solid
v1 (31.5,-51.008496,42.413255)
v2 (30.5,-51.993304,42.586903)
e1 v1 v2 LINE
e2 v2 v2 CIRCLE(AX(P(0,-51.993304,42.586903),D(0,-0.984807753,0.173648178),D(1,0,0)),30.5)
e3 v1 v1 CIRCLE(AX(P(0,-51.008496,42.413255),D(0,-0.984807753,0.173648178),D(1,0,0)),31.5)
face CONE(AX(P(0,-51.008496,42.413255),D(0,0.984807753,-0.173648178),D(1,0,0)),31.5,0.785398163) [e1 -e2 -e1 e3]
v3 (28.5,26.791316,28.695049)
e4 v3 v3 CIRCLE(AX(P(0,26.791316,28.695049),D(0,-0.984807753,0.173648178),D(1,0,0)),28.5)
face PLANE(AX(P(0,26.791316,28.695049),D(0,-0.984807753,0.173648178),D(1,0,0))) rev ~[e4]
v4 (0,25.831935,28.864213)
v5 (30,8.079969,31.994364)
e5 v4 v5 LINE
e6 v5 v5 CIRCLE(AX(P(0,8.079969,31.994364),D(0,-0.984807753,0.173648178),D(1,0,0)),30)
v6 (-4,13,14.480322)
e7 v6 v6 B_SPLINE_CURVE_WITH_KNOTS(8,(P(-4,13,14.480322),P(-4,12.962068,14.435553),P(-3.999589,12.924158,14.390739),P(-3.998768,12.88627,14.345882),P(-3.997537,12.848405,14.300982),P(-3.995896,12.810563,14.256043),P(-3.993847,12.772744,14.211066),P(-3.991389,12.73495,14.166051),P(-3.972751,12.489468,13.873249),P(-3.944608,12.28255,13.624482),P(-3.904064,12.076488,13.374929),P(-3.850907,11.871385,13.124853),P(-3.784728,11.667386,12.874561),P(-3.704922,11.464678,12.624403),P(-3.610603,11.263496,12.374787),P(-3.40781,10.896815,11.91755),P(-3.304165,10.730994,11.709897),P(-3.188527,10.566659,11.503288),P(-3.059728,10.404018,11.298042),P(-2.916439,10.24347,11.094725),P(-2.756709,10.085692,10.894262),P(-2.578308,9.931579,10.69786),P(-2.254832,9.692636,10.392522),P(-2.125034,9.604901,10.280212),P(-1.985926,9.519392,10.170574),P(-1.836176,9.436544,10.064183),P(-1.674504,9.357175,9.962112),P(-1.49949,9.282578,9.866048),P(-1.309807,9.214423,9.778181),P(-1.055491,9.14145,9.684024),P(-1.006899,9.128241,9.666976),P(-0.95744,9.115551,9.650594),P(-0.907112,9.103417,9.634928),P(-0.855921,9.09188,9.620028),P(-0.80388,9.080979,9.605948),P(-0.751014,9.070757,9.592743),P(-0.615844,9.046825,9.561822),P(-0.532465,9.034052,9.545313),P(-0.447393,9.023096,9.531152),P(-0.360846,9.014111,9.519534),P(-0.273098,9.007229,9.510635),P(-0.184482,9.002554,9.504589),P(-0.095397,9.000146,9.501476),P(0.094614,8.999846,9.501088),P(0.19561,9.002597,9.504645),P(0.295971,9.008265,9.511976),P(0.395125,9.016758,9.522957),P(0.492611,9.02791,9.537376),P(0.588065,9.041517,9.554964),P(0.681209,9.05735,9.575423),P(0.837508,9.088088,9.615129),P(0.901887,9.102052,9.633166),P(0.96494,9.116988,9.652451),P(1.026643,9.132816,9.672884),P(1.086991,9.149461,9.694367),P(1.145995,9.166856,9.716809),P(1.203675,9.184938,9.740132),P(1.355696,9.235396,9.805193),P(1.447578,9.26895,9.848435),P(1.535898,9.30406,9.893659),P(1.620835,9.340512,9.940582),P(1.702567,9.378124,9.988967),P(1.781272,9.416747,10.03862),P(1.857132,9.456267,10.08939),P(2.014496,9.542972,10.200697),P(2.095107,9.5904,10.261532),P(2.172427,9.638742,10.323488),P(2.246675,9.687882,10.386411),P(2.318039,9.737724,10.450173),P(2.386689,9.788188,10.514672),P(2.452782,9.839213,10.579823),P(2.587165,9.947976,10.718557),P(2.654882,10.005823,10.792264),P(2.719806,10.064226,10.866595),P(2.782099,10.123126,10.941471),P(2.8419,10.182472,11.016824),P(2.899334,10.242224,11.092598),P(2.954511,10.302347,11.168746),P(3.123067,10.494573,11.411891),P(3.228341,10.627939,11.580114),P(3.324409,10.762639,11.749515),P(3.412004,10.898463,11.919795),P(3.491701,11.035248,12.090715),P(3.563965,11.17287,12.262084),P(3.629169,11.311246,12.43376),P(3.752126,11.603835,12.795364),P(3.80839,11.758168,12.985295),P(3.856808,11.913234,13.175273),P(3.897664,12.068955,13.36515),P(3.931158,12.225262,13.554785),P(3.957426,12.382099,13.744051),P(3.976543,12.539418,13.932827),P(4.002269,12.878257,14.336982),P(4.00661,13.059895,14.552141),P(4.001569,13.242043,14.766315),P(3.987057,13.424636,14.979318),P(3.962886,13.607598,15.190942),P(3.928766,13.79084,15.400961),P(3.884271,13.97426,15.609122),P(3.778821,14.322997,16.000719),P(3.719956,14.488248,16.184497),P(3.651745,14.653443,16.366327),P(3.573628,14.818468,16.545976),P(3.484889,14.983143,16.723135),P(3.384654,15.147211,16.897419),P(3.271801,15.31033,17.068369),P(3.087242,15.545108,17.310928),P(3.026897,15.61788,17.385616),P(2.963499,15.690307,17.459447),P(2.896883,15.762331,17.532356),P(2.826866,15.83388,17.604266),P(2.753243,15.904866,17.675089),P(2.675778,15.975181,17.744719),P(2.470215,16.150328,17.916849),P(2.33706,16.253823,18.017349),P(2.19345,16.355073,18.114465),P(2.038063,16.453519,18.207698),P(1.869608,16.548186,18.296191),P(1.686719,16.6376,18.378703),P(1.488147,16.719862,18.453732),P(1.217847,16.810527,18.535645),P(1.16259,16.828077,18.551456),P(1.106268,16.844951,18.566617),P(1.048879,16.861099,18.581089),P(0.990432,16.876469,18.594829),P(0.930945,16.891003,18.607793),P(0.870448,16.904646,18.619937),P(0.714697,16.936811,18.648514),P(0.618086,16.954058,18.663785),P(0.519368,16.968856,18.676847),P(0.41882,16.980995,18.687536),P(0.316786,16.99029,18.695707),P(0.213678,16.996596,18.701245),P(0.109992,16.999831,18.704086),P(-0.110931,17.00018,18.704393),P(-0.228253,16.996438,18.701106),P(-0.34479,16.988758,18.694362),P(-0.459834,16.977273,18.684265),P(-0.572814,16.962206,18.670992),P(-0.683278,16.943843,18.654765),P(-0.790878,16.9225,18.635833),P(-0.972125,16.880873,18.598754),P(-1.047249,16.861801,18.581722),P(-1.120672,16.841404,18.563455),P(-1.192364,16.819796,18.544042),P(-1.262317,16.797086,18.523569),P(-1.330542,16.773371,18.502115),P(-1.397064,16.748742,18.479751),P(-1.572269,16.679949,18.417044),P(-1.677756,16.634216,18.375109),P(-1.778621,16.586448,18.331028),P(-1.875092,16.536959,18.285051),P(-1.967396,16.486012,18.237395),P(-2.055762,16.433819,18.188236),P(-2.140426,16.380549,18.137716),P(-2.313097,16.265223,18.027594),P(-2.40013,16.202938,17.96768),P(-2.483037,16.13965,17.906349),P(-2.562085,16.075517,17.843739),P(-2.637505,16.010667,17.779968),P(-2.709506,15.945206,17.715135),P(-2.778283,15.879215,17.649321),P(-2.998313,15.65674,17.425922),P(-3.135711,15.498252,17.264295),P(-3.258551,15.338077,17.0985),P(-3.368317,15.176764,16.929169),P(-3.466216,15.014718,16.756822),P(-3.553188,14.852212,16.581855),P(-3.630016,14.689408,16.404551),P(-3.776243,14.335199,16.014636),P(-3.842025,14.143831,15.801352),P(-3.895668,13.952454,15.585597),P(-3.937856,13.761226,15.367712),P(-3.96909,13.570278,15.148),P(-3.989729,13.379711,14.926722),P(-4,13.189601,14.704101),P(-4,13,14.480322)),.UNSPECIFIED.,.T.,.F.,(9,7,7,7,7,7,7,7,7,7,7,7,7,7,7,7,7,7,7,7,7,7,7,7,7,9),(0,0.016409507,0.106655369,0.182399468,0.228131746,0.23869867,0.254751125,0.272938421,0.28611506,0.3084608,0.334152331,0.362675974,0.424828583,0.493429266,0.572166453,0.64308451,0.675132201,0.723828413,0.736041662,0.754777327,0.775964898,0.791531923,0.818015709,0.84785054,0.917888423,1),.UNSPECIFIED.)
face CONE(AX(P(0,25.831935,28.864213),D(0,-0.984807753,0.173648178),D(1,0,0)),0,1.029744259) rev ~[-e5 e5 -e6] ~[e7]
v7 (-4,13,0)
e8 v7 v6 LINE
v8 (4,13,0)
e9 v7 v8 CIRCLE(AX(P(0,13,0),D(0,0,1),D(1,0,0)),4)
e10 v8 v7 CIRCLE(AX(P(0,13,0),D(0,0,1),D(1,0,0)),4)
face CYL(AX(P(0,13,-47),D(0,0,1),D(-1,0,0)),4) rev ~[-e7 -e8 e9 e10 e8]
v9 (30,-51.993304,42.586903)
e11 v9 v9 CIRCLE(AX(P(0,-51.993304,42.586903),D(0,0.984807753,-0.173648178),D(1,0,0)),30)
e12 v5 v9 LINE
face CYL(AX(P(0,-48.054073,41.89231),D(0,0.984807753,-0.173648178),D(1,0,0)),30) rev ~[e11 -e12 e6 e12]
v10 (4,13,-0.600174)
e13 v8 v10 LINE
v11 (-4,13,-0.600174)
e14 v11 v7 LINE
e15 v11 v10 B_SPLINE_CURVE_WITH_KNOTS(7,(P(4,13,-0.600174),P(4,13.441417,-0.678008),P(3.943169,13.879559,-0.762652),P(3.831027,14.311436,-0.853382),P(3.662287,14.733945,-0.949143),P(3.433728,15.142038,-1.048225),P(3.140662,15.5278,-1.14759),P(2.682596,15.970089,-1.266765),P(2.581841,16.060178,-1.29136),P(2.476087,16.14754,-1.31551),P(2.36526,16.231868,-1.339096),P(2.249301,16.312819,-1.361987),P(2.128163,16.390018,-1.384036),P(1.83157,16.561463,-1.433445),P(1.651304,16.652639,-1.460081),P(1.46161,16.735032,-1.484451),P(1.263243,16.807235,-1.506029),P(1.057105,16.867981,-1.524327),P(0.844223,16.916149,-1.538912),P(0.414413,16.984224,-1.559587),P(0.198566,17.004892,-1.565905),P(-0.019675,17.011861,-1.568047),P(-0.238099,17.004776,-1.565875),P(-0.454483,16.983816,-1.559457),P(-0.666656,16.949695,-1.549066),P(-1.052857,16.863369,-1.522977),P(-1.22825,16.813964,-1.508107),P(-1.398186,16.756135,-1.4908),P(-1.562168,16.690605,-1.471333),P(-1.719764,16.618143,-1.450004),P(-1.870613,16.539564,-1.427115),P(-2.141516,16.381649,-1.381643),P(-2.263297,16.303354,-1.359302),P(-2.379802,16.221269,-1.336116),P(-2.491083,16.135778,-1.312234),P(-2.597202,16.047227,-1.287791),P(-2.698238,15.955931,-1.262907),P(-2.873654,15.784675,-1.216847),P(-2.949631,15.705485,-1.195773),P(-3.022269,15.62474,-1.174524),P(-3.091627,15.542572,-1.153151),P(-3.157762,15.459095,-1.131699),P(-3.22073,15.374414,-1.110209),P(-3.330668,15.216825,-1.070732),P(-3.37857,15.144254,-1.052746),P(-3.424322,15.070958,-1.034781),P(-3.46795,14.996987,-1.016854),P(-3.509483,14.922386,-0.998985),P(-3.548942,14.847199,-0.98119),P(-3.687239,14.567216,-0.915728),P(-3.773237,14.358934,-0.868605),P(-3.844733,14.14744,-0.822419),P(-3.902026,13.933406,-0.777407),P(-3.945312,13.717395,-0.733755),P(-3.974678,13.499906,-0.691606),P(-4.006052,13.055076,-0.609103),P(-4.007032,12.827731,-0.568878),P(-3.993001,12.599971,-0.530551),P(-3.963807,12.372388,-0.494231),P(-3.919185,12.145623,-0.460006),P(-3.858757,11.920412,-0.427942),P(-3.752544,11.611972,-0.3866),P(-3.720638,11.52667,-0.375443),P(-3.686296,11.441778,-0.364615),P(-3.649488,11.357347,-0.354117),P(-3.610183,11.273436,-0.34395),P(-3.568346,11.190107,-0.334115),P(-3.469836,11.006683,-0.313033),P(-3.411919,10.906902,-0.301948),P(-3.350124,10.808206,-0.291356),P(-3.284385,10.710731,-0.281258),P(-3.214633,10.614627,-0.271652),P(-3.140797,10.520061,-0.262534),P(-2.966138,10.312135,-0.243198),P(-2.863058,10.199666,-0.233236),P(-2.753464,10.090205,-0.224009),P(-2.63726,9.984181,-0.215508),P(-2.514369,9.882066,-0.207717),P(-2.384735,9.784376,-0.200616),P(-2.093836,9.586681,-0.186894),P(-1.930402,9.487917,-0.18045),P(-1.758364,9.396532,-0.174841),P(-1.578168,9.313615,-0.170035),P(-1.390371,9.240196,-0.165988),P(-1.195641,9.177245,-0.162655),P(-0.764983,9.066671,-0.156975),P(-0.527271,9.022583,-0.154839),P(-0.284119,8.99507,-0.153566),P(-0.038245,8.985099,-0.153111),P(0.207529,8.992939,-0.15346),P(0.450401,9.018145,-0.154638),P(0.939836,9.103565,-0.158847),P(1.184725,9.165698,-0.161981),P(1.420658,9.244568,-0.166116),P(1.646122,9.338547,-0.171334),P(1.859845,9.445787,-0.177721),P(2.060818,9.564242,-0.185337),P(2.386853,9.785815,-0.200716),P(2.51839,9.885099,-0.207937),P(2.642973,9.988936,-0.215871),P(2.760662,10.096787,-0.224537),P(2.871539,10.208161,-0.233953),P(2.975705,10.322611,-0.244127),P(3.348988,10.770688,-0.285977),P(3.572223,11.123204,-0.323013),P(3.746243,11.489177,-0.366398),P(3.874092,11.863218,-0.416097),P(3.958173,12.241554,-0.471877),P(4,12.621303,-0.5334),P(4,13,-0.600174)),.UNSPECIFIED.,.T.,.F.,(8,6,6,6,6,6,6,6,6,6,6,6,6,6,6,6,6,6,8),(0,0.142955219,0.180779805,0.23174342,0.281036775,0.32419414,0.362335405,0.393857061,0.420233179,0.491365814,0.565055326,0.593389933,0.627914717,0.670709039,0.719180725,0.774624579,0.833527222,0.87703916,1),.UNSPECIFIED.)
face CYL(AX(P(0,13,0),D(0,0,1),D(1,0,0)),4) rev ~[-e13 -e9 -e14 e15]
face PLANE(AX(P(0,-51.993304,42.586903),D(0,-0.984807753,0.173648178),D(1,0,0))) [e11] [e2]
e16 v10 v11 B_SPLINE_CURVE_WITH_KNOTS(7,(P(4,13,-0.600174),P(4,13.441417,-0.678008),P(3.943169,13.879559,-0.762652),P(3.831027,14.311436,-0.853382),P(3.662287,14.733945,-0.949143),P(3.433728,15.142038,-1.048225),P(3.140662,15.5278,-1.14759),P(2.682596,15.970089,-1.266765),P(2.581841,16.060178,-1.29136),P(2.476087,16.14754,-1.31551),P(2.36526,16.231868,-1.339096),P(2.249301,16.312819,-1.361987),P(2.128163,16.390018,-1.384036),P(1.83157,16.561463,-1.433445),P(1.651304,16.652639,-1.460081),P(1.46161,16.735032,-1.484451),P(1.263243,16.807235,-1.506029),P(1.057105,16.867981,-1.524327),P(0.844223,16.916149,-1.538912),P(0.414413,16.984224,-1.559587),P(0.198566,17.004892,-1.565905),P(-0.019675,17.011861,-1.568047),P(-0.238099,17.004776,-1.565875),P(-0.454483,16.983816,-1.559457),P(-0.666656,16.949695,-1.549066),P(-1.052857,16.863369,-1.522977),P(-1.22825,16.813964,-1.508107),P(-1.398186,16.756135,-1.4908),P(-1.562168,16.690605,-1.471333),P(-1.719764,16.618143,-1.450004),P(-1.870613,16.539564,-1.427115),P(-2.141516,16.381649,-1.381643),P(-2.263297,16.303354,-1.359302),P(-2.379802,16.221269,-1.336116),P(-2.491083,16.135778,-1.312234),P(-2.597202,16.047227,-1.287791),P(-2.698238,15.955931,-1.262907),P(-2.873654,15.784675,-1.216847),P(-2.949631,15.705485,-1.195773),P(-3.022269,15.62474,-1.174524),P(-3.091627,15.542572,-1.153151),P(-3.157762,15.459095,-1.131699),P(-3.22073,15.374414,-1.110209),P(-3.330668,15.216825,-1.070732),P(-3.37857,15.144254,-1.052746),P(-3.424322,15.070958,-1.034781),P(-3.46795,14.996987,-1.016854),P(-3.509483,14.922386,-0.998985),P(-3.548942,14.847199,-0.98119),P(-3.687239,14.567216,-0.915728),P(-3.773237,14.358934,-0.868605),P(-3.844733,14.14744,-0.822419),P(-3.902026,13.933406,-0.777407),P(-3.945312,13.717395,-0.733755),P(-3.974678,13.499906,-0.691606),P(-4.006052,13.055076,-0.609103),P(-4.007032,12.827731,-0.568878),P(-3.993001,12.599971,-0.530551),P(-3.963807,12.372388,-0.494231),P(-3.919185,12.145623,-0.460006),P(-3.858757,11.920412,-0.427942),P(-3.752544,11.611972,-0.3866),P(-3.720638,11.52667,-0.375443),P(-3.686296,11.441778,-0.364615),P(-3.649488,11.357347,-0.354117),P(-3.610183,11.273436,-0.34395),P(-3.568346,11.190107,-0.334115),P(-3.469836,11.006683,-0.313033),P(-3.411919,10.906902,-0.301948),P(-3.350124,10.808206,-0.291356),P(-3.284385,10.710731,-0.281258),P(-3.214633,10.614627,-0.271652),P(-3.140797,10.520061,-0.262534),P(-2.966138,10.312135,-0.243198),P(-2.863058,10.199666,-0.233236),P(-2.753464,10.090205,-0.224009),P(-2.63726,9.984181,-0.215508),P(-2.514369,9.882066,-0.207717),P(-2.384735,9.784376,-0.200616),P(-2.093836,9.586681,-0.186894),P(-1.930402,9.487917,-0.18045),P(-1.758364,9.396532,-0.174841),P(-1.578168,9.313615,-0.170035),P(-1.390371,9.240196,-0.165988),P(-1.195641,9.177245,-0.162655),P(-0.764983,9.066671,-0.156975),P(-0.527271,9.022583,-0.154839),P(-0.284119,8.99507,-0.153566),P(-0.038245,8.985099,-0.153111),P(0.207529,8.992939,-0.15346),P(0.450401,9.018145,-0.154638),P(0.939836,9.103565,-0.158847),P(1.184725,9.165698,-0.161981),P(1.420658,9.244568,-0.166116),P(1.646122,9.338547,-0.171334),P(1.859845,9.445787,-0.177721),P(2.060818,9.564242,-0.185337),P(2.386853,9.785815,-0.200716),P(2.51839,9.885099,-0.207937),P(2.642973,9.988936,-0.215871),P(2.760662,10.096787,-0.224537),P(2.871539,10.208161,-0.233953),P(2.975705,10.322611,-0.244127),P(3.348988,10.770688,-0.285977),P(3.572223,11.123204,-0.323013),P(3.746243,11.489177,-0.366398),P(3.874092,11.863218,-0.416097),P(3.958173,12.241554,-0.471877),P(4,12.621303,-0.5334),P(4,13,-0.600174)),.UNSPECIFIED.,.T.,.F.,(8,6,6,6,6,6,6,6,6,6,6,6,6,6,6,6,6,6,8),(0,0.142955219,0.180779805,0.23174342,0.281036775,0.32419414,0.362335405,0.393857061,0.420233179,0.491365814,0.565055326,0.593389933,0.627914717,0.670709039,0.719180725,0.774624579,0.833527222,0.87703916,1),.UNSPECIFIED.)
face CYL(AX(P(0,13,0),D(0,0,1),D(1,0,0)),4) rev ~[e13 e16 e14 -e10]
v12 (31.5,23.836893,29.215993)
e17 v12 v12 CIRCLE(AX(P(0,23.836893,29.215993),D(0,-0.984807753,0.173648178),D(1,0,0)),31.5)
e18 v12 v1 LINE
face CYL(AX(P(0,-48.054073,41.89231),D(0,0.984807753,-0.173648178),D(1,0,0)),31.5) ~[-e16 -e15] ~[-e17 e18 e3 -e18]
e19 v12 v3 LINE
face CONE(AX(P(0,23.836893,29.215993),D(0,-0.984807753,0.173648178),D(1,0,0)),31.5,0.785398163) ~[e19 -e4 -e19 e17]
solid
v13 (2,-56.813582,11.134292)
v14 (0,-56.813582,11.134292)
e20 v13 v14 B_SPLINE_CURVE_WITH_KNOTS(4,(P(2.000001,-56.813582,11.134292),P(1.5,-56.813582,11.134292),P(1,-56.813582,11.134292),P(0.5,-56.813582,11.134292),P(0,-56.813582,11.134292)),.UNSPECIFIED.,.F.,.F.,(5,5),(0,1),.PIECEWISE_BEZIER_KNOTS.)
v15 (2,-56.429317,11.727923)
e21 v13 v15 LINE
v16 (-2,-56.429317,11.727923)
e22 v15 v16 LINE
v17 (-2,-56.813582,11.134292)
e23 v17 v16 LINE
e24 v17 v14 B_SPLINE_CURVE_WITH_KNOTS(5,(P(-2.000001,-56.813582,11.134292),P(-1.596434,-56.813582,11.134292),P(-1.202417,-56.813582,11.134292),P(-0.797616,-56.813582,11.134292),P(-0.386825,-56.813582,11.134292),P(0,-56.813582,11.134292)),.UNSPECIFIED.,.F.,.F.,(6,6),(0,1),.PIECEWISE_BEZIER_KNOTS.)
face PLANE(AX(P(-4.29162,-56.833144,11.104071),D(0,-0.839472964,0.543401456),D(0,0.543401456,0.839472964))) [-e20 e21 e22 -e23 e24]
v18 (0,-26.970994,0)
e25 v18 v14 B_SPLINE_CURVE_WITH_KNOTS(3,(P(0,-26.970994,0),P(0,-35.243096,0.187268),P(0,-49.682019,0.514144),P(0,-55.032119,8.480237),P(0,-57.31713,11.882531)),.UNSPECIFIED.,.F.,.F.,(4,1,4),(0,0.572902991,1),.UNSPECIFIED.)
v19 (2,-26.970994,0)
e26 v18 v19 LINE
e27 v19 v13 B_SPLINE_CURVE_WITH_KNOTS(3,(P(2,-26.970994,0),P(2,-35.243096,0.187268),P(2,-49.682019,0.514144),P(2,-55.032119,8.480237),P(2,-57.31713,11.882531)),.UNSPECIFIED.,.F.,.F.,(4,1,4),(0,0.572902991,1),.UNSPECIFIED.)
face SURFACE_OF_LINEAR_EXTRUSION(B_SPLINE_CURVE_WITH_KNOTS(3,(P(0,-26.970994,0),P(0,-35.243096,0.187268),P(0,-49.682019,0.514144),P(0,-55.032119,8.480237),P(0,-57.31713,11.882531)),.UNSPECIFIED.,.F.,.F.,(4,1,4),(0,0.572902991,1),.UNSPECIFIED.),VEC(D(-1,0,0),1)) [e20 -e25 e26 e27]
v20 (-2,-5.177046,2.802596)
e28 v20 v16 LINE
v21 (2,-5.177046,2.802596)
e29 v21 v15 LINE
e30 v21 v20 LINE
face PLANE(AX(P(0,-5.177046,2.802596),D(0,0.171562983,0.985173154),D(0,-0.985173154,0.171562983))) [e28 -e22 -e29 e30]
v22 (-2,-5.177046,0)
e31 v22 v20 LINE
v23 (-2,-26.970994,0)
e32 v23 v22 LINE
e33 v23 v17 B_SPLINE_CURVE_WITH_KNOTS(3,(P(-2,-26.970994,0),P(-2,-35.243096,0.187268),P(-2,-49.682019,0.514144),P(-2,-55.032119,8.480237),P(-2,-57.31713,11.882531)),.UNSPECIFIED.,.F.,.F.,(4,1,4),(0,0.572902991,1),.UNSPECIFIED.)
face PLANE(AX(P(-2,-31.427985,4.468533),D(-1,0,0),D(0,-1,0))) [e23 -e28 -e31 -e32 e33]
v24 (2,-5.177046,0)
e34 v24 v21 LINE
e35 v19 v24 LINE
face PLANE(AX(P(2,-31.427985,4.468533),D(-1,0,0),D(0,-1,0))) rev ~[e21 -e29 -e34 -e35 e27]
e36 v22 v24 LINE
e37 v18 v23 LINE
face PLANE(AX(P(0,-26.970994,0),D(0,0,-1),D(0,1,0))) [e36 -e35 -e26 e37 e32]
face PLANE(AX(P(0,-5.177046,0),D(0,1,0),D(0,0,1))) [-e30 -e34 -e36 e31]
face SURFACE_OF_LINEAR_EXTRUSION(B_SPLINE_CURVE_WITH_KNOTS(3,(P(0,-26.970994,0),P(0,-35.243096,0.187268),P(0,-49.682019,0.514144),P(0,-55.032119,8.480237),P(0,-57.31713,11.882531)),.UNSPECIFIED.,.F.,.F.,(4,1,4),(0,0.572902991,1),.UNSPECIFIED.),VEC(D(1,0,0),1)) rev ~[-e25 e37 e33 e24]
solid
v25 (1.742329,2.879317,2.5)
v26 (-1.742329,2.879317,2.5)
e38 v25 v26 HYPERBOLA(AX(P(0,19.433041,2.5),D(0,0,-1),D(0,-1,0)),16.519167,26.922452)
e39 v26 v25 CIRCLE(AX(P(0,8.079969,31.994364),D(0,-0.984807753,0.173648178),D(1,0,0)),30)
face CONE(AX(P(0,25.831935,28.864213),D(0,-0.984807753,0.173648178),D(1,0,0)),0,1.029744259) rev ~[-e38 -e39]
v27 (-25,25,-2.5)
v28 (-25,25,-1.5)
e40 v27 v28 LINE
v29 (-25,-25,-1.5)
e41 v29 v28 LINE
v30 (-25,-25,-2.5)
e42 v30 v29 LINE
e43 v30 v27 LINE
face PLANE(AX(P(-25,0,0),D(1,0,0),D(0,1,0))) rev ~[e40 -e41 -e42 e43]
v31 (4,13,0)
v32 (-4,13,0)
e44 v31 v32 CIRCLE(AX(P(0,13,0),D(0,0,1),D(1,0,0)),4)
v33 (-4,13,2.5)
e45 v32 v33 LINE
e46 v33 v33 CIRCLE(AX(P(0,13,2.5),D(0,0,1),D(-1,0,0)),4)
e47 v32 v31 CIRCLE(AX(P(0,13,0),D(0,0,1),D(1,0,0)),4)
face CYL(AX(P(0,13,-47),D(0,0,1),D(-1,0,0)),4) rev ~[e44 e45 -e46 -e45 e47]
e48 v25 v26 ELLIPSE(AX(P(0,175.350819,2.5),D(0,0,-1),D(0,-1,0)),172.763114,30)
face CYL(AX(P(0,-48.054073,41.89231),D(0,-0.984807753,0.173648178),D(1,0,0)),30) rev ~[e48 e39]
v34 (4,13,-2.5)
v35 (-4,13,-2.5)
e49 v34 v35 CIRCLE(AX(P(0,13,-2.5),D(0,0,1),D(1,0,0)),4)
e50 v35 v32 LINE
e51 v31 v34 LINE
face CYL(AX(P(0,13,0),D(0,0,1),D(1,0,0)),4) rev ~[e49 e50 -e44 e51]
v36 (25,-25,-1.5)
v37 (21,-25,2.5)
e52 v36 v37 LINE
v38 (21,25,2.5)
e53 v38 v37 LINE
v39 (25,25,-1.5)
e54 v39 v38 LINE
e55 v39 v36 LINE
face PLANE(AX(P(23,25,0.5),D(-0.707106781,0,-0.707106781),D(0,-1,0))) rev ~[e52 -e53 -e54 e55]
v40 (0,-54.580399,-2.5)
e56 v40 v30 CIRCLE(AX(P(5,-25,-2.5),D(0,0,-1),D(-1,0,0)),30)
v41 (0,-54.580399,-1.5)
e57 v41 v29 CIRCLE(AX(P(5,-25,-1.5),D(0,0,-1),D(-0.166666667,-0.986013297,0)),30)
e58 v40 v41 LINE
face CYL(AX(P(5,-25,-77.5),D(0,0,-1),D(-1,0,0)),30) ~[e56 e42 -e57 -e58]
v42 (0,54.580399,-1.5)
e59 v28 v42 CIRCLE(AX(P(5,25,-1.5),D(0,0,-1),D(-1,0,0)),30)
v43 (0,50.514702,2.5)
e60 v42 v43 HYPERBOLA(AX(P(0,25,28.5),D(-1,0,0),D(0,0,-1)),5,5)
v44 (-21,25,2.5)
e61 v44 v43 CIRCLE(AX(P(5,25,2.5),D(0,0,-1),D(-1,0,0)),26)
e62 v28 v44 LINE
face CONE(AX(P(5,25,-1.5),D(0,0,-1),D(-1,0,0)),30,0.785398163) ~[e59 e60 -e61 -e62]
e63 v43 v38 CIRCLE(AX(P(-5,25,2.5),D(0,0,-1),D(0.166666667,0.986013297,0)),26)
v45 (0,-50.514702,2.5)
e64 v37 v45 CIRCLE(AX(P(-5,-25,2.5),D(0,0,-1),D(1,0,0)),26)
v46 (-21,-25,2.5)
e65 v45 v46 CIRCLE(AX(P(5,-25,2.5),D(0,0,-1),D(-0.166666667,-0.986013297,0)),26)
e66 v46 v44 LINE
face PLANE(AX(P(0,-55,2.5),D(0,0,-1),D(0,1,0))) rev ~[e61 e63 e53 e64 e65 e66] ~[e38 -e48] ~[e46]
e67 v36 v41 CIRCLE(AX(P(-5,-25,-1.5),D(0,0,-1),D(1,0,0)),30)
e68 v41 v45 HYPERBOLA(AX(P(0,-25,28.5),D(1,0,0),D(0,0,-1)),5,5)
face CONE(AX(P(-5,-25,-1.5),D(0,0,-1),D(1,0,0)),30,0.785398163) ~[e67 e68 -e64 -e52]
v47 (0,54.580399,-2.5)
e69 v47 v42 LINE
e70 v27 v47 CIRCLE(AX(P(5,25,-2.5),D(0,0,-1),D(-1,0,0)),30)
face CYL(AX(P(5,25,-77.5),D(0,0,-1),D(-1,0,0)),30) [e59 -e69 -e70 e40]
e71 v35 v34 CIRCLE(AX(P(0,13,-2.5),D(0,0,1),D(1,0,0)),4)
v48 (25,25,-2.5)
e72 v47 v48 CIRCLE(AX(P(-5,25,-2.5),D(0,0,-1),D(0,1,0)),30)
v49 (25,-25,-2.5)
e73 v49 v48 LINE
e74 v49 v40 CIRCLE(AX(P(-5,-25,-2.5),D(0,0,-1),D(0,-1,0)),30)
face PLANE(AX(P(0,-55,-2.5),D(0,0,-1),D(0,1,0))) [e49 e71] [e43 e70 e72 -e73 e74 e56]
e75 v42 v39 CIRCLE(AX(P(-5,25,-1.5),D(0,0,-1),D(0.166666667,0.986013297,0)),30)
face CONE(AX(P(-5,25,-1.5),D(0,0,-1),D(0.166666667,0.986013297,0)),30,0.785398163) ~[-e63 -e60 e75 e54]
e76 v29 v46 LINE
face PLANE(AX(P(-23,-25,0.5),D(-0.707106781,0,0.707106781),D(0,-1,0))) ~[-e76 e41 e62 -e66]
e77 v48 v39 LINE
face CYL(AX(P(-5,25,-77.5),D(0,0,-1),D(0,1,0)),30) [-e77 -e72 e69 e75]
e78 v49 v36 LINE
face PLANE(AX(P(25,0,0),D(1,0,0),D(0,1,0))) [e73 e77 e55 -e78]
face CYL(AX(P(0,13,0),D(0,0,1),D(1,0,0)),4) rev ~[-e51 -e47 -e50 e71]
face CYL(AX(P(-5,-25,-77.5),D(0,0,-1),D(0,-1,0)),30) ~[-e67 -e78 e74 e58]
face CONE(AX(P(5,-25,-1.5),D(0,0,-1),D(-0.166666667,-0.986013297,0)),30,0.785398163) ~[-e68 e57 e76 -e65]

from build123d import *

# Parameters (mm, degrees)
F0_W          = 110
F0_H          = 5
F1_DEPTH      = 25
F3_R          = 31.5
F4_DEPTH      = 76
F4_DEPTH_BACK = 4
F5_D          = 60
F5_DEPTH      = 57
F5_TIP        = 18.0258185708
F5_2_D        = 60
F5_2_DEPTH    = 57
F5_2_TIP      = 18.0258185708
F6_D          = 60
F6_DEPTH      = 45
F6_TIP        = 18.0258185708
F8_D          = 8
F8_DEPTH      = 47
F8_TIP        = 2.4034424761
F8_2_D        = 8
F8_2_DEPTH    = 47
F8_2_TIP      = 2.4034424761
F10_DEPTH     = 2
F11_T1_DEPTH  = 155
F12_SIZE      = 3
F13_SIZE      = 1
F14_SIZE      = 4
F15_D         = 8
F15_DEPTH     = 47
F15_TIP       = 2.4034424761
F15_2_D       = 8
F15_2_DEPTH   = 47
F15_2_TIP     = 2.4034424761
F16_T1_DEPTH  = 4.2916195716
F16_T3_DEPTH  = 4.2916195716


# Not quite as in the source:
# - a fillet or chamfer that OpenCascade refuses, or shapes differently, is made with other operations: its cross-section is extruded or revolved along the edge and cut away or added


with BuildPart() as f1:
    # F0 (on Right) → F1 (new body, symmetric)
    with BuildSketch(Plane.YZ):
        Rectangle(F0_W, F0_H)
    extrude(amount=F1_DEPTH, both=True)

    # F5 (one way)
    with BuildSketch(Plane(origin=(0, -53.7690722508, 9.4809381655), x_dir=(1, 0, 0), z_dir=(0, -0.984807753, 0.1736481777))):
        with Locations((0, 32.9113696108)):
            Circle(F5_D / 2)
    extrude(amount=-F5_DEPTH, mode=Mode.SUBTRACT)
    with Locations(Plane(origin=(0, -53.7690722508, 9.4809381655), x_dir=(1, 0, 0), z_dir=(0, -0.984807753, 0.1736481777))):
        with Locations((0, 32.9113696108)):
            with Locations((0, 0, -(F5_DEPTH + F5_TIP / 2))):  # 118° drill point
                Cone(0, F5_D / 2, F5_TIP, mode=Mode.SUBTRACT)

    # F8 (one way)
    with BuildSketch(Plane.XY):
        with Locations((0, 13)):
            Circle(F8_D / 2)
    extrude(amount=-F8_DEPTH, mode=Mode.SUBTRACT)
    with Locations(Plane.XY):
        with Locations((0, 13)):
            with Locations((0, 0, -(F8_DEPTH + F8_TIP / 2))):  # 118° drill point
                Cone(0, F8_D / 2, F8_TIP, mode=Mode.SUBTRACT)

    # F11: fillet of radius 30 on 4 edges, made by hand

    # F11_s2 → F11_t1 (cut)
    with BuildSketch(Plane.XY.offset(-77.5)):
        with BuildLine():
            ThreePointArc((-25, -25), (-16.2132034356, -46.2132034356), (5, -55))
            Line((5, -55), (-25, -55))
            Line((-25, -55), (-25, -25))
        make_face()
        with BuildLine():
            ThreePointArc((-5, -55), (16.2132034356, -46.2132034356), (25, -25))
            Line((25, -25), (25, -55))
            Line((25, -55), (-5, -55))
        make_face()
        with BuildLine():
            ThreePointArc((-25, 25), (-16.2132034356, 46.2132034356), (5, 55))
            Line((5, 55), (-25, 55))
            Line((-25, 55), (-25, 25))
        make_face()
        with BuildLine():
            ThreePointArc((-5, 55), (16.2132034356, 46.2132034356), (25, 25))
            Line((25, 25), (25, 55))
            Line((25, 55), (-5, 55))
        make_face()
    extrude(amount=F11_T1_DEPTH, mode=Mode.SUBTRACT)

    # F14
    f14_edges = [f1.edges().sort_by_distance(p)[0] for p in [
        (17.912878, -44.364917, 2.5),
        (25, 0, 2.5),
        (17.912878, 44.364917, 2.5),
        (-17.912878, 44.364917, 2.5),
        (-25, 0, 2.5),
        (-17.912878, -44.364917, 2.5),
    ]]
    chamfer(f14_edges, length=F14_SIZE)

    # F15
    with Locations(Plane(origin=(0, 0, 0), x_dir=(1, 0, 0), z_dir=(0, 0, -1))):
        with Locations((0, -13)):
            Hole(F15_D / 2, depth=F15_DEPTH)
            with Locations((0, 0, -(F15_DEPTH + F15_TIP / 2))):  # 118° drill point
                Cone(0, F15_D / 2, F15_TIP, mode=Mode.SUBTRACT)


with BuildPart() as f4:
    # F3 (on face) → F4 (new body, two sides)
    with BuildSketch(Plane(origin=(0, -53.7690722508, 9.4809381655), x_dir=(1, 0, 0), z_dir=(0, -0.984807753, 0.1736481777))) as f4_sk:
        with Locations((0, 32.9113696108)):
            Circle(F3_R)
    extrude(amount=-F4_DEPTH)
    extrude(f4_sk.sketch, amount=F4_DEPTH_BACK)

    # F5#2 (one way)
    with BuildSketch(Plane(origin=(0, -53.7690722508, 9.4809381655), x_dir=(1, 0, 0), z_dir=(0, -0.984807753, 0.1736481777))):
        with Locations((0, 32.9113696108)):
            Circle(F5_2_D / 2)
    extrude(amount=-F5_2_DEPTH, mode=Mode.SUBTRACT)
    with Locations(Plane(origin=(0, -53.7690722508, 9.4809381655), x_dir=(1, 0, 0), z_dir=(0, -0.984807753, 0.1736481777))):
        with Locations((0, 32.9113696108)):
            with Locations((0, 0, -(F5_2_DEPTH + F5_2_TIP / 2))):  # 118° drill point
                Cone(0, F5_2_D / 2, F5_2_TIP, mode=Mode.SUBTRACT)

    # F6 (one way)
    with BuildSketch(Plane(origin=(0, -53.7690722508, 9.4809381655), x_dir=(1, 0, 0), z_dir=(0, 0.984807753, -0.1736481777))):
        with Locations((0, -32.9113696108)):
            Circle(F6_D / 2)
    extrude(amount=-F6_DEPTH, mode=Mode.SUBTRACT)
    with Locations(Plane(origin=(0, -53.7690722508, 9.4809381655), x_dir=(1, 0, 0), z_dir=(0, 0.984807753, -0.1736481777))):
        with Locations((0, -32.9113696108)):
            with Locations((0, 0, -(F6_DEPTH + F6_TIP / 2))):  # 118° drill point
                Cone(0, F6_D / 2, F6_TIP, mode=Mode.SUBTRACT)

    # F8#2 (one way)
    with BuildSketch(Plane.XY):
        with Locations((0, 13)):
            Circle(F8_2_D / 2)
    extrude(amount=-F8_2_DEPTH, mode=Mode.SUBTRACT)
    with Locations(Plane.XY):
        with Locations((0, 13)):
            with Locations((0, 0, -(F8_2_DEPTH + F8_2_TIP / 2))):  # 118° drill point
                Cone(0, F8_2_D / 2, F8_2_TIP, mode=Mode.SUBTRACT)

    # F12
    f12_edges = [f4.edges().sort_by_distance(p)[0] for p in [
        (-31.5, 26.791316, 28.695049),
    ]]
    chamfer(f12_edges, length=F12_SIZE)

    # F13
    f13_edges = [f4.edges().sort_by_distance(p)[0] for p in [
        (-31.5, -51.993304, 42.586903),
    ]]
    chamfer(f13_edges, length=F13_SIZE)

    # F15#2
    with Locations(Plane(origin=(0, 0, 0), x_dir=(1, 0, 0), z_dir=(0, 0, -1))):
        with Locations((0, -13)):
            Hole(F15_2_D / 2, depth=F15_2_DEPTH)
            with Locations((0, 0, -(F15_2_DEPTH + F15_2_TIP / 2))):  # 118° drill point
                Cone(0, F15_2_D / 2, F15_2_TIP, mode=Mode.SUBTRACT)


with BuildPart() as f10:
    # F9 (on Right) → F10 (new body, symmetric)
    with BuildSketch(Plane.YZ):
        with BuildLine():
            add(Edge.make_bspline(
                [(-26.9709937274, 0), (-35.2430958686, 0.1872683322), (-49.6820188119, 0.5141444964), (-55.0321186352, 8.4802371226), (-57.3171302676, 11.8825314566)],
                knots=[0, 0, 0, 0, 0.572902991, 1, 1, 1, 1], degree=3))
            Line((-26.9709937274, 0), (-5.1770457067, 0))
            Line((-5.1770457067, 0), (-5.1770457067, 2.8025961947))
            Line((-5.1770457067, 2.8025961947), (-57.3171302676, 11.8825314566))
        make_face()
    extrude(amount=F10_DEPTH, both=True)

    # F16: chamfer of 0.9 on 2 edges, made by hand

    # F16_s2 → F16_t1 (cut)
    with BuildSketch(Plane.YZ.offset(-4.2916195716)):
        with BuildLine():
            Line((-56.8331442384, 11.1040709469), (-56.4097543552, 11.7581442044))
            Line((-56.4097543552, 11.7581442044), (-56.4066662215, 11.7758773211))
            ThreePointArc((-56.4066662215, 11.7758773211), (-56.8631960445, 11.8217519791), (-57.3140421339, 11.9002645734))
            Line((-57.3140421339, 11.9002645734), (-57.3320729998, 11.8724957826))
            ThreePointArc((-57.3320729998, 11.8724957826), (-57.0766052058, 11.4923137573), (-56.8480585259, 11.0939930489))
            Line((-56.8480585259, 11.0939930489), (-56.8331442384, 11.1040709469))
        make_face()
    extrude(amount=F16_T1_DEPTH, mode=Mode.SUBTRACT)

    # F16_s4 → F16_t3 (cut)
    with BuildSketch(Plane.YZ):
        with BuildLine():
            Line((-56.8331442384, 11.1040709469), (-56.4097543552, 11.7581442044))
            Line((-56.4097543552, 11.7581442044), (-56.4066662215, 11.7758773211))
            ThreePointArc((-56.4066662215, 11.7758773211), (-56.8631960445, 11.8217519791), (-57.3140421339, 11.9002645734))
            Line((-57.3140421339, 11.9002645734), (-57.3320729998, 11.8724957826))
            ThreePointArc((-57.3320729998, 11.8724957826), (-57.0766052058, 11.4923137573), (-56.8480585259, 11.0939930489))
            Line((-56.8480585259, 11.0939930489), (-56.8331442384, 11.1040709469))
        make_face()
    extrude(amount=F16_T3_DEPTH, mode=Mode.SUBTRACT)


solid = Compound([f1.part, f4.part, f10.part])
